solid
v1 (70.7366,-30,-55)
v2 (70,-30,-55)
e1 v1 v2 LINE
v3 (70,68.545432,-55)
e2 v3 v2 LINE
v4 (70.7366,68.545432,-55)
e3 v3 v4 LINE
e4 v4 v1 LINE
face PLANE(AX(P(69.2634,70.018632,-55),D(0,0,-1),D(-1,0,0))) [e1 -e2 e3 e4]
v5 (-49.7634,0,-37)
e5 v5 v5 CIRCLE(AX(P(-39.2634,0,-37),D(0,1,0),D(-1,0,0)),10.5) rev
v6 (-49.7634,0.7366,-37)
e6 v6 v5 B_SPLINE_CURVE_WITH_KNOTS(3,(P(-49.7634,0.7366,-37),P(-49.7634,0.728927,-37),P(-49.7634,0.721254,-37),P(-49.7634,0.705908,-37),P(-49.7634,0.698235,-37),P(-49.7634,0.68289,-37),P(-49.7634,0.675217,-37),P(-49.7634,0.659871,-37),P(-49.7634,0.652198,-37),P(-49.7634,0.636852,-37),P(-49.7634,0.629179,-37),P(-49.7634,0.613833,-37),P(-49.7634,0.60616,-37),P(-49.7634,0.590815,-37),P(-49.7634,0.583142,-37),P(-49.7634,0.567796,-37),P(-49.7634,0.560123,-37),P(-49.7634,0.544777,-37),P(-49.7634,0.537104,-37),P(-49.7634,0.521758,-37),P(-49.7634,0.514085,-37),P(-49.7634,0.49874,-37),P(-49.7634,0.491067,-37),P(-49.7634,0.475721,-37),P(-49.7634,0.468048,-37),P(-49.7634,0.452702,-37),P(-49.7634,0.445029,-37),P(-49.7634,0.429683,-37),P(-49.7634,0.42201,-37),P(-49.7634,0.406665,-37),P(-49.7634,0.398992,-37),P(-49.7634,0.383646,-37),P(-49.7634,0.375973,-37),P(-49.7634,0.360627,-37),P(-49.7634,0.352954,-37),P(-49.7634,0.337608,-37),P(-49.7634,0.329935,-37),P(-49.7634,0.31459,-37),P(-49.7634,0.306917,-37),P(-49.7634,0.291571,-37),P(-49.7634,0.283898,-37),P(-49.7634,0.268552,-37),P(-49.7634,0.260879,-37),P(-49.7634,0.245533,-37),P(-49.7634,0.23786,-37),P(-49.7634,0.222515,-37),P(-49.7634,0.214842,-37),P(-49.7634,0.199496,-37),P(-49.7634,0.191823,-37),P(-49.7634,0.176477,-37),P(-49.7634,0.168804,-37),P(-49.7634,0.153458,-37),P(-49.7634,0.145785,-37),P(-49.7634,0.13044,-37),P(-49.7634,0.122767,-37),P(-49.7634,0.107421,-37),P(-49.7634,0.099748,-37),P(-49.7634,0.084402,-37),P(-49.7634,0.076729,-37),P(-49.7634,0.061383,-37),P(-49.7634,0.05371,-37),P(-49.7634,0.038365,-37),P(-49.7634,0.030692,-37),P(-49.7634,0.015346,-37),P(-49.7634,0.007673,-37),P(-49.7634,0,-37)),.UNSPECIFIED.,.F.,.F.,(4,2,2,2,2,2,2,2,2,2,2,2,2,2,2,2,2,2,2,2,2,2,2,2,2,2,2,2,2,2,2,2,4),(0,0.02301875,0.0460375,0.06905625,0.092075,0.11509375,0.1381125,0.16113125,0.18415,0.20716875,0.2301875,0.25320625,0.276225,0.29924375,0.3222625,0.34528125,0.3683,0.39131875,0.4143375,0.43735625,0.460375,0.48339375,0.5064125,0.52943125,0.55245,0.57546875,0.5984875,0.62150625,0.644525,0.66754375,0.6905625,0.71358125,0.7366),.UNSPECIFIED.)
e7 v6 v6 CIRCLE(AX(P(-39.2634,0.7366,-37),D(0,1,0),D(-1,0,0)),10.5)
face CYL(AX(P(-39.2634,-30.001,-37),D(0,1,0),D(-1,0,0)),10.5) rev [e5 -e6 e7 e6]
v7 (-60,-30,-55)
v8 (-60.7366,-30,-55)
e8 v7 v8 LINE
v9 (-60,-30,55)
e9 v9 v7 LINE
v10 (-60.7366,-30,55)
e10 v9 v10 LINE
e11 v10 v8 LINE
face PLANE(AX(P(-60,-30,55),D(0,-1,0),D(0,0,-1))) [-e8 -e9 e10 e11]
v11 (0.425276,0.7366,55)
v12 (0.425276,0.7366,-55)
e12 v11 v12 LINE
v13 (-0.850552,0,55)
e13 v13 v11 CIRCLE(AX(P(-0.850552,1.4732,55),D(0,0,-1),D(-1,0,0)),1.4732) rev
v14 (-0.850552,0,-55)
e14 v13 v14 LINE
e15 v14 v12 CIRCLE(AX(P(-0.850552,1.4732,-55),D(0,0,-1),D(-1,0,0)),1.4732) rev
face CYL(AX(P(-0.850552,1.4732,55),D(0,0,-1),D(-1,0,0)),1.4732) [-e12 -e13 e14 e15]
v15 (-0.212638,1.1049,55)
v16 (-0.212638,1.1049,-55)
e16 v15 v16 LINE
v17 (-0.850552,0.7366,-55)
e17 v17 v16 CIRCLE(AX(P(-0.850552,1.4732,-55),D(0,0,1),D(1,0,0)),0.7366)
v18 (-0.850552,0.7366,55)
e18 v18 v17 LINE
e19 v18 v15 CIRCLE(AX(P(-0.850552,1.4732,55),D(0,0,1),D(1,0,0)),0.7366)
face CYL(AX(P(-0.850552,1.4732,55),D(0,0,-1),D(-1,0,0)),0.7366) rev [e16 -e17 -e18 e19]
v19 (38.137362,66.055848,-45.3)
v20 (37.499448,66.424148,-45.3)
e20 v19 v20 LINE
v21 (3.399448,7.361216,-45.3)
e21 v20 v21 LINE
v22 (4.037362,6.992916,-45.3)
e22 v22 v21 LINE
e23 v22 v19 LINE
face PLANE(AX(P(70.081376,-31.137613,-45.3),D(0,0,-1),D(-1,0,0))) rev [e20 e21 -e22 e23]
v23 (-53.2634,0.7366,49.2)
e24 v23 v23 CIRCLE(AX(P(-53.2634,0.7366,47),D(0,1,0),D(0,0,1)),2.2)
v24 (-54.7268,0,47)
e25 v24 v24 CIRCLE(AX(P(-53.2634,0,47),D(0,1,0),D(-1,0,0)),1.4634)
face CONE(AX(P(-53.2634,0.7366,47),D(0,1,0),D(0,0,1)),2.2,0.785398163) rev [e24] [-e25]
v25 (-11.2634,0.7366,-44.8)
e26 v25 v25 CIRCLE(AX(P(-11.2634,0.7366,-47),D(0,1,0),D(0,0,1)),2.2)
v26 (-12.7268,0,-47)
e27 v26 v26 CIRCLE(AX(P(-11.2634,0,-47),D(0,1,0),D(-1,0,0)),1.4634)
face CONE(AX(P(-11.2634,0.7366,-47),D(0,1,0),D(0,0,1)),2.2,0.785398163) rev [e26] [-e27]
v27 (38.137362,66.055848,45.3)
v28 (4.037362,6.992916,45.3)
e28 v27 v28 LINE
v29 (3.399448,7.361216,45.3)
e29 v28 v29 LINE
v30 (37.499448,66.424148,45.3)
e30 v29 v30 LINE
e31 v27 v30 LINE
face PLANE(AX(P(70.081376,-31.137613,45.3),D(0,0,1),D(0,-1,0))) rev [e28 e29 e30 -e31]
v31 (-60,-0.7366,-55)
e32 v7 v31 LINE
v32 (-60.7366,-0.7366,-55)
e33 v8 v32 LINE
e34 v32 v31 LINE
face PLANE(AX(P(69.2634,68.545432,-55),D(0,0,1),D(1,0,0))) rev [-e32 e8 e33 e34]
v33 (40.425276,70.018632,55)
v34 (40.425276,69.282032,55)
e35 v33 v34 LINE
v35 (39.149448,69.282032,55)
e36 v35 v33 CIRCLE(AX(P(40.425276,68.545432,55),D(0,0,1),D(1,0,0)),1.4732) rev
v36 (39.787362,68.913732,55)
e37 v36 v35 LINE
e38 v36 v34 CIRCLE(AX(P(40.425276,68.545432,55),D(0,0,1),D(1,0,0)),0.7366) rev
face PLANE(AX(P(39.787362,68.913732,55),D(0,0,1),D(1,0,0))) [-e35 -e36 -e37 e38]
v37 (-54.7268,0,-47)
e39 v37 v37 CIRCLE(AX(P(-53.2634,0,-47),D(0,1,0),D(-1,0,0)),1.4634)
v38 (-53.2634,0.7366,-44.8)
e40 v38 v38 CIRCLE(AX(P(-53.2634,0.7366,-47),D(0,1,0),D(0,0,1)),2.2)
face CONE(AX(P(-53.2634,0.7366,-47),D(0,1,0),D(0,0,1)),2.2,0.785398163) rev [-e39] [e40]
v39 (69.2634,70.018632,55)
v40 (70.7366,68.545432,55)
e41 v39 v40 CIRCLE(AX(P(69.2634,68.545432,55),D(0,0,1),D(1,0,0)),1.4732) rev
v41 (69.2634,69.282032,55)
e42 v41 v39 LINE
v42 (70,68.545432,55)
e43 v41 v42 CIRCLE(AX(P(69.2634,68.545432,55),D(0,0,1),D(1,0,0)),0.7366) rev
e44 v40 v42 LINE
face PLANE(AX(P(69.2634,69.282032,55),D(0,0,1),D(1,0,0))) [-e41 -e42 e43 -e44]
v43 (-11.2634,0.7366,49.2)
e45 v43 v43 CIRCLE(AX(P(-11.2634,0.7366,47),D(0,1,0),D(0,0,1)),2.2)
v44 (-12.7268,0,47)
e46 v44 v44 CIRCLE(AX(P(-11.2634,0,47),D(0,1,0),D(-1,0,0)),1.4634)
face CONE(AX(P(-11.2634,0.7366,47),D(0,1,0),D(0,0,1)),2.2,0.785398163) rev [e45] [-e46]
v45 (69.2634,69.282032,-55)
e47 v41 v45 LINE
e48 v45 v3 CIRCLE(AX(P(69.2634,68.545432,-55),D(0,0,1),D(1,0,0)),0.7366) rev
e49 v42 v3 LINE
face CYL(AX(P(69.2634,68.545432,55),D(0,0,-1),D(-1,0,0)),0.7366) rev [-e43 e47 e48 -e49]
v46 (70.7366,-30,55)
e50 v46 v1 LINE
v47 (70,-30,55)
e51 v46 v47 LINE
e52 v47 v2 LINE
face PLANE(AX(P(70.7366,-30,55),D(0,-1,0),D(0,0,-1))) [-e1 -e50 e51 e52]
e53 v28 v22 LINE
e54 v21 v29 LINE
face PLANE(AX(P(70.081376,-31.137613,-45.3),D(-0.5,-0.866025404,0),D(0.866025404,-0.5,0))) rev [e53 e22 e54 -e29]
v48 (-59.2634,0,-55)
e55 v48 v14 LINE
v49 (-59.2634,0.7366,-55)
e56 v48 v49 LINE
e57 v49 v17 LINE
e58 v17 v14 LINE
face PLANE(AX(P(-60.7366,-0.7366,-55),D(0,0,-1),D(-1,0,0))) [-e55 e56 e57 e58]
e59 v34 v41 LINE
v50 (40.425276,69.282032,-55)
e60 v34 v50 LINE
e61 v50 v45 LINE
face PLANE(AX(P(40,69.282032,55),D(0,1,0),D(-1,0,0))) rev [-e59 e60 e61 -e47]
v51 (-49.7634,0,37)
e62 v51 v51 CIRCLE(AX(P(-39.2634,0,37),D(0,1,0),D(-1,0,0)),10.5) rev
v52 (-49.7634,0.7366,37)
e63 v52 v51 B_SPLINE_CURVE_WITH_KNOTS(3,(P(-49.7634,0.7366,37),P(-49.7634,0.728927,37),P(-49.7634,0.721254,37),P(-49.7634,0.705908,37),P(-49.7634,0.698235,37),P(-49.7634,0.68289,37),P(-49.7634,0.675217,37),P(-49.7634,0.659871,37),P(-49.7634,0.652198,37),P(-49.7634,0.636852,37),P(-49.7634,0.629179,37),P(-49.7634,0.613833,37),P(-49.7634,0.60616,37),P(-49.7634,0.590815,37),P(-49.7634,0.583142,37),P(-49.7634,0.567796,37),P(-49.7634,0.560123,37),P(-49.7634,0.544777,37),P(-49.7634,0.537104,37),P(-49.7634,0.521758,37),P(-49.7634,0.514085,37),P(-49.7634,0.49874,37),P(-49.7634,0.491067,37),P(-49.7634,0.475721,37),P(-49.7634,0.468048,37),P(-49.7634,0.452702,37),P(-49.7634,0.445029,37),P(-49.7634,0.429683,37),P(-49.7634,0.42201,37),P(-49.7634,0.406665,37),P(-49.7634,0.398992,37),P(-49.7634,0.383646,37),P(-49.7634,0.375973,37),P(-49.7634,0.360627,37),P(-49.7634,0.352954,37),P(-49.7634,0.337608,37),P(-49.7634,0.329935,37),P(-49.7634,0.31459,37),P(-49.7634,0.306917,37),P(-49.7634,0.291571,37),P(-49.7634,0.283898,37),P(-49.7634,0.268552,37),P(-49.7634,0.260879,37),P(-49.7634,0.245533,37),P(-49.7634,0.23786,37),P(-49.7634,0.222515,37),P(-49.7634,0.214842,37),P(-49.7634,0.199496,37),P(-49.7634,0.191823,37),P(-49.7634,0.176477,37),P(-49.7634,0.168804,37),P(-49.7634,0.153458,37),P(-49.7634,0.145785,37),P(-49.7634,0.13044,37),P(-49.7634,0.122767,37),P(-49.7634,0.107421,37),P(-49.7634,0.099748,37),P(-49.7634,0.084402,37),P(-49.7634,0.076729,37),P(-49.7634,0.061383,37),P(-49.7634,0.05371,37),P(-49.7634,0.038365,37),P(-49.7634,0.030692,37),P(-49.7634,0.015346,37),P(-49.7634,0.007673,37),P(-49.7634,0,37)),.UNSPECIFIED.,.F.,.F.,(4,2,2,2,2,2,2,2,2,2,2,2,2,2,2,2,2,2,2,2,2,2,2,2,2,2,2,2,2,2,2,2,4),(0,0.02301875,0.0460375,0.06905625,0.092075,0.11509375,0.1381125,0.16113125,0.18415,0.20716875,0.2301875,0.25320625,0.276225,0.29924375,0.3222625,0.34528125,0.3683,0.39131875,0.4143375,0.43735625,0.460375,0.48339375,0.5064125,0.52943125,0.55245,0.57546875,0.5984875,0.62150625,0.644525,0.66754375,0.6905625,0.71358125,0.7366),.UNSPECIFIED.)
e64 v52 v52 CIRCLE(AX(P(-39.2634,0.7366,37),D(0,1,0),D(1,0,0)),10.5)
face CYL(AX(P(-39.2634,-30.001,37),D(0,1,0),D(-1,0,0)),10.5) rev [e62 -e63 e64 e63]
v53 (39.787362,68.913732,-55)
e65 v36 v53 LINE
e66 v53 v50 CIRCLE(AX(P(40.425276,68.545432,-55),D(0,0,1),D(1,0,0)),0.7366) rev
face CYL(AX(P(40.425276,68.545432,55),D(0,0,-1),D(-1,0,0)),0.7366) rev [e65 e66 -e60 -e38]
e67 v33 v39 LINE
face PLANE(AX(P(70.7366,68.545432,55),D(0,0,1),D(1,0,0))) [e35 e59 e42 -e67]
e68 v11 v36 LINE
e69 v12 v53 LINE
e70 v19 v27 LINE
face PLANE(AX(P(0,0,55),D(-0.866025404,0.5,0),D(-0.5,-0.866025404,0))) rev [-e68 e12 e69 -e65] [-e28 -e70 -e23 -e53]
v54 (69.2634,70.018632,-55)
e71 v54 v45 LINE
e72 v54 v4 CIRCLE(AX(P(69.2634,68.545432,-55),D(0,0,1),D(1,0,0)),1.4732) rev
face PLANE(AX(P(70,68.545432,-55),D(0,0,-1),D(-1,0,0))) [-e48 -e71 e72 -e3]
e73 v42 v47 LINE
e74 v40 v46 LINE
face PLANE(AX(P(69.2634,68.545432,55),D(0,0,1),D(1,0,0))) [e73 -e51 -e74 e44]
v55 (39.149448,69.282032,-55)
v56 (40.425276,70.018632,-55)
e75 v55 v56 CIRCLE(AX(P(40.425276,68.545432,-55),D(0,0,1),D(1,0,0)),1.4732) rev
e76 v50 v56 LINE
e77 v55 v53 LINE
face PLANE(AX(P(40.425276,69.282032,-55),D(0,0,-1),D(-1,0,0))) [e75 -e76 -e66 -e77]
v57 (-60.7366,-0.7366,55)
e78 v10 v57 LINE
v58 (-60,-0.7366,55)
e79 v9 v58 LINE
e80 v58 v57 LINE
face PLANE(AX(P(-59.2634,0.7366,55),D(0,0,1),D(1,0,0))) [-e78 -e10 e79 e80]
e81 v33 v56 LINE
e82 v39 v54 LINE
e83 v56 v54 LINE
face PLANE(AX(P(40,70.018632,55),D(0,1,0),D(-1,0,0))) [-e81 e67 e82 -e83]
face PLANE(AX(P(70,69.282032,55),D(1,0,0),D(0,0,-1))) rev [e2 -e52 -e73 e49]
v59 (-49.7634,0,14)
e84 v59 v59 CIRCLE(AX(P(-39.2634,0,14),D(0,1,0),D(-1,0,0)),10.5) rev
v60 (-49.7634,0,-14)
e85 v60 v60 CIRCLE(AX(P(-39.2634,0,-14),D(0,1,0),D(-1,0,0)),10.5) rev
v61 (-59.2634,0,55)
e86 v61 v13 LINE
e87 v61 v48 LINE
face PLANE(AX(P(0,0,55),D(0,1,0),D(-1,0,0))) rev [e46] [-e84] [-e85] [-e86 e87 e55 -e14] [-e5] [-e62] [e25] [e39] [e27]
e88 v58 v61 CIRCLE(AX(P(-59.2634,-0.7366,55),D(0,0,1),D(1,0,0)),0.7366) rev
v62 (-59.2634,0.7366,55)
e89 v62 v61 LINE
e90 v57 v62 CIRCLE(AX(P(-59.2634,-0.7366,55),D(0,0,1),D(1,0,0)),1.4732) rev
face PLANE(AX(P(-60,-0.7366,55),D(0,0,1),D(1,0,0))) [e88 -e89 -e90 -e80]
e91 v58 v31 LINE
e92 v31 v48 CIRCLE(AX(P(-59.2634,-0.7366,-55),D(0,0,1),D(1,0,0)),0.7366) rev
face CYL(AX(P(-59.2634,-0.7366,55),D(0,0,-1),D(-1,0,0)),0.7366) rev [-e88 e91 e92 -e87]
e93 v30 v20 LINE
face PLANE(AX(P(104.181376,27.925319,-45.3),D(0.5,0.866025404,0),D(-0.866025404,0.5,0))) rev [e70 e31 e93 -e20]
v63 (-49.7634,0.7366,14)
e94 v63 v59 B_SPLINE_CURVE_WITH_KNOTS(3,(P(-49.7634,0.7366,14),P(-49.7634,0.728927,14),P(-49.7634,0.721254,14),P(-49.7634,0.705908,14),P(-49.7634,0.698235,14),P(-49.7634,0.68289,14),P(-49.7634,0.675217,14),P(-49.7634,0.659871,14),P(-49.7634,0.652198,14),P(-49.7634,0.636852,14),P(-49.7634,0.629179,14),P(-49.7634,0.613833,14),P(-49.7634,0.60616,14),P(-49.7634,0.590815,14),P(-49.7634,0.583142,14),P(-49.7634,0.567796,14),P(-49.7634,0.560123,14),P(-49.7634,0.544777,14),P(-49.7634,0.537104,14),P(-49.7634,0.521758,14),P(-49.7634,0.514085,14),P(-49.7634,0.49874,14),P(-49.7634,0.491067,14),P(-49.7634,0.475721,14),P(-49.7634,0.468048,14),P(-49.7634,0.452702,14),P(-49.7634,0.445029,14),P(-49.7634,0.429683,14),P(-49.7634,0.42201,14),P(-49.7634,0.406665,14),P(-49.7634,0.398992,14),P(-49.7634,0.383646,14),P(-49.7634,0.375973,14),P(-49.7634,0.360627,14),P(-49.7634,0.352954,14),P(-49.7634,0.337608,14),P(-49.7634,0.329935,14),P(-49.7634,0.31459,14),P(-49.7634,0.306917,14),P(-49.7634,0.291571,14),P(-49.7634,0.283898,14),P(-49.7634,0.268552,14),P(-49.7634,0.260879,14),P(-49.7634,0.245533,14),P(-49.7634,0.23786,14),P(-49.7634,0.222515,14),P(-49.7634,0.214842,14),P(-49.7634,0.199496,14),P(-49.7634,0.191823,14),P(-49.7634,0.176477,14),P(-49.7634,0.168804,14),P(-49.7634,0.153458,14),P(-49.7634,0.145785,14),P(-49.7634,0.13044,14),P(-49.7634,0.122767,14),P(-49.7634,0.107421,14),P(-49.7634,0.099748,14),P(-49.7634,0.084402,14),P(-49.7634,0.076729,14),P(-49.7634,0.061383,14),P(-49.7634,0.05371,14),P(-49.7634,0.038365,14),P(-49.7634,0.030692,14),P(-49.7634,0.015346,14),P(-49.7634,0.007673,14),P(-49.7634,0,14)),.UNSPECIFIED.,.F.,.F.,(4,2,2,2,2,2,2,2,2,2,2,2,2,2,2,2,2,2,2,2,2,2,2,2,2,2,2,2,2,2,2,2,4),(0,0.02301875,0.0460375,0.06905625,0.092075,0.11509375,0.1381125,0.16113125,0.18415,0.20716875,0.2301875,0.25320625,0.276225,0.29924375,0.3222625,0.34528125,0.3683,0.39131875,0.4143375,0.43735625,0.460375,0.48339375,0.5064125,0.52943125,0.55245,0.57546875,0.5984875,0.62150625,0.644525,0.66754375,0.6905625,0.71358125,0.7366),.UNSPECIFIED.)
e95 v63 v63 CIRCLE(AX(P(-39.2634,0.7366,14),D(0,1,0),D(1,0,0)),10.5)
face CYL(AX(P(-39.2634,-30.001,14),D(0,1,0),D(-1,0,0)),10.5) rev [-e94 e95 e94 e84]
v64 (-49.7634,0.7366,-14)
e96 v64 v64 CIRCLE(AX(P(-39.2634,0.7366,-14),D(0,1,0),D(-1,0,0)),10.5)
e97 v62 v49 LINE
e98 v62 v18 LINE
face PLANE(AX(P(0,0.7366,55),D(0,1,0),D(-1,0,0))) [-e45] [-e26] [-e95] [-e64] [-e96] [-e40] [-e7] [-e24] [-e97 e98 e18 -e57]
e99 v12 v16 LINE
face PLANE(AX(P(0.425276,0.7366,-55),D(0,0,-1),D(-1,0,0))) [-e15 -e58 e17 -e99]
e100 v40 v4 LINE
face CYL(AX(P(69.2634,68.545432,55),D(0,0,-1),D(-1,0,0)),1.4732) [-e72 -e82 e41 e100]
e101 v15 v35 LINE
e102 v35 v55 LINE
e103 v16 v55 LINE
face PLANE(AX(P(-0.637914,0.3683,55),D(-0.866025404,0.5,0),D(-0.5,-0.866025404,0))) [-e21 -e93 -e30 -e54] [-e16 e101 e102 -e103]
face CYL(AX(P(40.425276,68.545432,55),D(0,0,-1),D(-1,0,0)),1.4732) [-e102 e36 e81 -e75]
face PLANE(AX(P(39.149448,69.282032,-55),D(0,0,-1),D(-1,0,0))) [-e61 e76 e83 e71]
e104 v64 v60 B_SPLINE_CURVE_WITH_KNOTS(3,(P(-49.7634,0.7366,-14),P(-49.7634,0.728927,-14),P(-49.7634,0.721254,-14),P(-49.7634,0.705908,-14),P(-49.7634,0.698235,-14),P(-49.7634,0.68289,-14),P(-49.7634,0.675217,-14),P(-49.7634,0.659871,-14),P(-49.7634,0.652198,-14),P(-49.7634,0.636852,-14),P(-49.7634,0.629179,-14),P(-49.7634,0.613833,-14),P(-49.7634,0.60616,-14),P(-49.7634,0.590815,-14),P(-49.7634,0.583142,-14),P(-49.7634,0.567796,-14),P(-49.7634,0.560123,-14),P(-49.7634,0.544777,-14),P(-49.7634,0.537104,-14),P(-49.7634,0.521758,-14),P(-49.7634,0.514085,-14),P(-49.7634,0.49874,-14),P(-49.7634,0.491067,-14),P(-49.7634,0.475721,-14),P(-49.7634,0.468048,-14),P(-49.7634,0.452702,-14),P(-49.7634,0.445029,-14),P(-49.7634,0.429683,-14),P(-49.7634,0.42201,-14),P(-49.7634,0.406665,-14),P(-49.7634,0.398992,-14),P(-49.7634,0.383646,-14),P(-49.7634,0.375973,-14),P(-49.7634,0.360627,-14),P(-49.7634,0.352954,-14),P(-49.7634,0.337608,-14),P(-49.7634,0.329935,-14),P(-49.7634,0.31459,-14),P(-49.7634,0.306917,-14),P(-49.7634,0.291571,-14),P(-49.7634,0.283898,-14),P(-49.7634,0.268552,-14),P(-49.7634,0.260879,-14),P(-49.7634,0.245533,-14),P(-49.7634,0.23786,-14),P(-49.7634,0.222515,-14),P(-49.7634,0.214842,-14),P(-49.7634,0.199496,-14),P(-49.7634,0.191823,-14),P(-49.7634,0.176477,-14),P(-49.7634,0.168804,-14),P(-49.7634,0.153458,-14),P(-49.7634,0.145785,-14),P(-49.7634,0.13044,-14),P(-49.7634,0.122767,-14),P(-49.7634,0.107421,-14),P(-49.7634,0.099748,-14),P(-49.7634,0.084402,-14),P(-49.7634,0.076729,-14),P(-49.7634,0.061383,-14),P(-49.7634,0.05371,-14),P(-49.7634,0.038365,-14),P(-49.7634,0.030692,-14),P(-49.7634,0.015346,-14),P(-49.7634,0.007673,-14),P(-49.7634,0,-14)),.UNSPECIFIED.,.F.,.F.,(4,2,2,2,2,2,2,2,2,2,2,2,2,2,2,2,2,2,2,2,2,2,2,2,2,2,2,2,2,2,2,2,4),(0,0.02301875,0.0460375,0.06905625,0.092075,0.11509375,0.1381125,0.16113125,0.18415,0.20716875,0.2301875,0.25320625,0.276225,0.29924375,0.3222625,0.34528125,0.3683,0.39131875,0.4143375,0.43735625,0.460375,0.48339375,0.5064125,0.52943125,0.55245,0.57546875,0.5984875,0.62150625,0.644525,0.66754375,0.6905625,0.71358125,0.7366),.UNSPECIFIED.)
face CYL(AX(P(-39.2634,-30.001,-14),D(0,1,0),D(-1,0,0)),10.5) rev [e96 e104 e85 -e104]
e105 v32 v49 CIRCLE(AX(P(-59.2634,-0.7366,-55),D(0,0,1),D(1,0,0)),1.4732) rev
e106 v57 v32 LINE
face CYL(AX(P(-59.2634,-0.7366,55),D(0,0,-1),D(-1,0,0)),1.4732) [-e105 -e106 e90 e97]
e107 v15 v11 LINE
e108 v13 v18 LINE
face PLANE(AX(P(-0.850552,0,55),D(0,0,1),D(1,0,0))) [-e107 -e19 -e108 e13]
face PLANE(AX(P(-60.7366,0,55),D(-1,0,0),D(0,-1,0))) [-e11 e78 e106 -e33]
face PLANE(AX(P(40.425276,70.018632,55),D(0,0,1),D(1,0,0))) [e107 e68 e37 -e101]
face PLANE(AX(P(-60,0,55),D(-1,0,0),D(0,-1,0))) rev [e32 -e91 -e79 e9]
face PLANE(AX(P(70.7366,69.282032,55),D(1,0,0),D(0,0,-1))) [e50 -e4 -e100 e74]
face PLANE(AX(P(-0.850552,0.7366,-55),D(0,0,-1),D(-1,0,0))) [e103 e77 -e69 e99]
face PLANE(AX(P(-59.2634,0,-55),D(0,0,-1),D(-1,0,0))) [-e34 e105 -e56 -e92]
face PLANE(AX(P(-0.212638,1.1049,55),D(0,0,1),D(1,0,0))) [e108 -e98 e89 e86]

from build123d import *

# Parameters (mm, degrees)
BASE_FLANGE1_DEPTH                              = 55
CUT_EXTRUDE2_REACH                              = 115.264
SKETCH6_R                                       = 10.5
CUT_EXTRUDE3_REACH                              = 115.888
SKETCH7_W                                       = 90.6
SKETCH7_H                                       = 68.2
CSK_FOR_M2_FLAT_HEAD_MACHINE_SCREW1_D           = 2.4
CSK_FOR_M2_FLAT_HEAD_MACHINE_SCREW1_CSINK_D     = 4.4
CSK_FOR_M2_FLAT_HEAD_MACHINE_SCREW1_CSINK_ANGLE = 90


# Sheet-metal steps are written as plain solids
with BuildPart() as part:
    # Sketch1 → Base-Flange1 (new, symmetric)
    with BuildSketch(Plane.XY):
        with BuildLine():
            Line((70, -30), (70, 68.545432303))
            ThreePointArc((70, 68.545432303), (69.784254855, 69.066287158), (69.2634, 69.282032303))
            Line((69.2634, 69.282032303), (40.425276208, 69.282032303))
            ThreePointArc((40.425276208, 69.282032303), (40.056976208, 69.183346615), (39.787361896, 68.913732303))
            Line((39.787361896, 68.913732303), (0.425276208, 0.7366))
            ThreePointArc((0.425276208, 0.7366), (-0.113952417, 0.197371375), (-0.850552417, 0))
            Line((-0.850552417, 0), (-59.2634, 0))
            ThreePointArc((-59.2634, 0), (-59.784254855, -0.215745145), (-60, -0.7366))
            Line((-60, -0.7366), (-60, -30))
            Line((-60, -30), (-60.7366, -30))
            Line((-60.7366, -30), (-60.7366, -0.7366))
            ThreePointArc((-60.7366, -0.7366), (-60.30510971, 0.30510971), (-59.2634, 0.7366))
            Line((-59.2634, 0.7366), (-0.850552417, 0.7366))
            ThreePointArc((-0.850552417, 0.7366), (-0.482252417, 0.835285688), (-0.212638104, 1.1049))
            Line((-0.212638104, 1.1049), (39.149447583, 69.282032303))
            ThreePointArc((39.149447583, 69.282032303), (39.688676208, 69.821260928), (40.425276208, 70.018632303))
            Line((40.425276208, 70.018632303), (69.2634, 70.018632303))
            ThreePointArc((69.2634, 70.018632303), (70.30510971, 69.587142013), (70.7366, 68.545432303))
            Line((70.7366, 68.545432303), (70.7366, -30))
            Line((70.7366, -30), (70, -30))
        make_face()
    extrude(amount=BASE_FLANGE1_DEPTH, both=True)

    # Sketch6 → Cut-Extrude2 (cut, up to next)
    with BuildSketch(Plane(origin=(0, 0.7366, 0), x_dir=(1, 0, 0), z_dir=(0, 1, 0)), mode=Mode.PRIVATE) as cut_extrude2_sk1:
        with Locations(Location((-39.2634, 14, 0), (0, 0, 180))):
            Circle(SKETCH6_R)
    cut_extrude2_tool1 = extrude(cut_extrude2_sk1.sketch, amount=-CUT_EXTRUDE2_REACH, mode=Mode.PRIVATE) & part.part
    # Sketch6 → Cut-Extrude2 (cut, up to next)
    with BuildSketch(Plane(origin=(0, 0.7366, 0), x_dir=(1, 0, 0), z_dir=(0, 1, 0)), mode=Mode.PRIVATE) as cut_extrude2_sk2:
        with Locations(Location((-39.2634, 37, 0), (0, 0, 180))):
            Circle(SKETCH6_R)
    cut_extrude2_tool2 = extrude(cut_extrude2_sk2.sketch, amount=-CUT_EXTRUDE2_REACH, mode=Mode.PRIVATE) & part.part
    # Sketch6 → Cut-Extrude2 (cut, up to next)
    with BuildSketch(Plane(origin=(0, 0.7366, 0), x_dir=(1, 0, 0), z_dir=(0, 1, 0)), mode=Mode.PRIVATE) as cut_extrude2_sk3:
        with Locations(Location((-39.2634, -14, 0), (0, 0, 180))):
            Circle(SKETCH6_R)
    cut_extrude2_tool3 = extrude(cut_extrude2_sk3.sketch, amount=-CUT_EXTRUDE2_REACH, mode=Mode.PRIVATE) & part.part
    # Sketch6 → Cut-Extrude2 (cut, up to next)
    with BuildSketch(Plane(origin=(0, 0.7366, 0), x_dir=(1, 0, 0), z_dir=(0, 1, 0)), mode=Mode.PRIVATE) as cut_extrude2_sk4:
        with Locations(Location((-39.2634, -37, 0), (0, 0, 180))):
            Circle(SKETCH6_R)
    cut_extrude2_tool4 = extrude(cut_extrude2_sk4.sketch, amount=-CUT_EXTRUDE2_REACH, mode=Mode.PRIVATE) & part.part
    add(cut_extrude2_tool1.solids().sort_by_distance((-39.2634, 0.7366, -14))[0], mode=Mode.SUBTRACT)
    add(cut_extrude2_tool2.solids().sort_by_distance((-39.2634, 0.7366, -37))[0], mode=Mode.SUBTRACT)
    add(cut_extrude2_tool3.solids().sort_by_distance((-39.2634, 0.7366, 14))[0], mode=Mode.SUBTRACT)
    add(cut_extrude2_tool4.solids().sort_by_distance((-39.2634, 0.7366, 37))[0], mode=Mode.SUBTRACT)

    # Sketch7 → Cut-Extrude3 (cut, up to next)
    with BuildSketch(Plane(origin=(-0.637914312, 0.3683, 0), x_dir=(0, 0, 1), z_dir=(-0.8660254037844365, 0.500000000000004, 0)), mode=Mode.PRIVATE) as cut_extrude3_sk1:
        with Locations((0, 42.174723792)):
            Rectangle(SKETCH7_W, SKETCH7_H)
    cut_extrude3_tool1 = extrude(cut_extrude3_sk1.sketch, amount=-CUT_EXTRUDE3_REACH, mode=Mode.PRIVATE) & part.part
    add(cut_extrude3_tool1.solids().sort_by_distance((20.449448, 36.892682, 0))[0], mode=Mode.SUBTRACT)

    # CSK for M2 Flat Head Machine Screw1 (through all)
    with Locations(Plane(origin=(0, 0.7366, 0), x_dir=(1, 0, 0), z_dir=(0, 1, 0))):
        with Locations((-53.2634, 47), (-11.2634, 47), (-11.2634, -47), (-53.2634, -47)):
            CounterSinkHole(CSK_FOR_M2_FLAT_HEAD_MACHINE_SCREW1_D / 2, CSK_FOR_M2_FLAT_HEAD_MACHINE_SCREW1_CSINK_D / 2, counter_sink_angle=CSK_FOR_M2_FLAT_HEAD_MACHINE_SCREW1_CSINK_ANGLE)


solid = part.part
